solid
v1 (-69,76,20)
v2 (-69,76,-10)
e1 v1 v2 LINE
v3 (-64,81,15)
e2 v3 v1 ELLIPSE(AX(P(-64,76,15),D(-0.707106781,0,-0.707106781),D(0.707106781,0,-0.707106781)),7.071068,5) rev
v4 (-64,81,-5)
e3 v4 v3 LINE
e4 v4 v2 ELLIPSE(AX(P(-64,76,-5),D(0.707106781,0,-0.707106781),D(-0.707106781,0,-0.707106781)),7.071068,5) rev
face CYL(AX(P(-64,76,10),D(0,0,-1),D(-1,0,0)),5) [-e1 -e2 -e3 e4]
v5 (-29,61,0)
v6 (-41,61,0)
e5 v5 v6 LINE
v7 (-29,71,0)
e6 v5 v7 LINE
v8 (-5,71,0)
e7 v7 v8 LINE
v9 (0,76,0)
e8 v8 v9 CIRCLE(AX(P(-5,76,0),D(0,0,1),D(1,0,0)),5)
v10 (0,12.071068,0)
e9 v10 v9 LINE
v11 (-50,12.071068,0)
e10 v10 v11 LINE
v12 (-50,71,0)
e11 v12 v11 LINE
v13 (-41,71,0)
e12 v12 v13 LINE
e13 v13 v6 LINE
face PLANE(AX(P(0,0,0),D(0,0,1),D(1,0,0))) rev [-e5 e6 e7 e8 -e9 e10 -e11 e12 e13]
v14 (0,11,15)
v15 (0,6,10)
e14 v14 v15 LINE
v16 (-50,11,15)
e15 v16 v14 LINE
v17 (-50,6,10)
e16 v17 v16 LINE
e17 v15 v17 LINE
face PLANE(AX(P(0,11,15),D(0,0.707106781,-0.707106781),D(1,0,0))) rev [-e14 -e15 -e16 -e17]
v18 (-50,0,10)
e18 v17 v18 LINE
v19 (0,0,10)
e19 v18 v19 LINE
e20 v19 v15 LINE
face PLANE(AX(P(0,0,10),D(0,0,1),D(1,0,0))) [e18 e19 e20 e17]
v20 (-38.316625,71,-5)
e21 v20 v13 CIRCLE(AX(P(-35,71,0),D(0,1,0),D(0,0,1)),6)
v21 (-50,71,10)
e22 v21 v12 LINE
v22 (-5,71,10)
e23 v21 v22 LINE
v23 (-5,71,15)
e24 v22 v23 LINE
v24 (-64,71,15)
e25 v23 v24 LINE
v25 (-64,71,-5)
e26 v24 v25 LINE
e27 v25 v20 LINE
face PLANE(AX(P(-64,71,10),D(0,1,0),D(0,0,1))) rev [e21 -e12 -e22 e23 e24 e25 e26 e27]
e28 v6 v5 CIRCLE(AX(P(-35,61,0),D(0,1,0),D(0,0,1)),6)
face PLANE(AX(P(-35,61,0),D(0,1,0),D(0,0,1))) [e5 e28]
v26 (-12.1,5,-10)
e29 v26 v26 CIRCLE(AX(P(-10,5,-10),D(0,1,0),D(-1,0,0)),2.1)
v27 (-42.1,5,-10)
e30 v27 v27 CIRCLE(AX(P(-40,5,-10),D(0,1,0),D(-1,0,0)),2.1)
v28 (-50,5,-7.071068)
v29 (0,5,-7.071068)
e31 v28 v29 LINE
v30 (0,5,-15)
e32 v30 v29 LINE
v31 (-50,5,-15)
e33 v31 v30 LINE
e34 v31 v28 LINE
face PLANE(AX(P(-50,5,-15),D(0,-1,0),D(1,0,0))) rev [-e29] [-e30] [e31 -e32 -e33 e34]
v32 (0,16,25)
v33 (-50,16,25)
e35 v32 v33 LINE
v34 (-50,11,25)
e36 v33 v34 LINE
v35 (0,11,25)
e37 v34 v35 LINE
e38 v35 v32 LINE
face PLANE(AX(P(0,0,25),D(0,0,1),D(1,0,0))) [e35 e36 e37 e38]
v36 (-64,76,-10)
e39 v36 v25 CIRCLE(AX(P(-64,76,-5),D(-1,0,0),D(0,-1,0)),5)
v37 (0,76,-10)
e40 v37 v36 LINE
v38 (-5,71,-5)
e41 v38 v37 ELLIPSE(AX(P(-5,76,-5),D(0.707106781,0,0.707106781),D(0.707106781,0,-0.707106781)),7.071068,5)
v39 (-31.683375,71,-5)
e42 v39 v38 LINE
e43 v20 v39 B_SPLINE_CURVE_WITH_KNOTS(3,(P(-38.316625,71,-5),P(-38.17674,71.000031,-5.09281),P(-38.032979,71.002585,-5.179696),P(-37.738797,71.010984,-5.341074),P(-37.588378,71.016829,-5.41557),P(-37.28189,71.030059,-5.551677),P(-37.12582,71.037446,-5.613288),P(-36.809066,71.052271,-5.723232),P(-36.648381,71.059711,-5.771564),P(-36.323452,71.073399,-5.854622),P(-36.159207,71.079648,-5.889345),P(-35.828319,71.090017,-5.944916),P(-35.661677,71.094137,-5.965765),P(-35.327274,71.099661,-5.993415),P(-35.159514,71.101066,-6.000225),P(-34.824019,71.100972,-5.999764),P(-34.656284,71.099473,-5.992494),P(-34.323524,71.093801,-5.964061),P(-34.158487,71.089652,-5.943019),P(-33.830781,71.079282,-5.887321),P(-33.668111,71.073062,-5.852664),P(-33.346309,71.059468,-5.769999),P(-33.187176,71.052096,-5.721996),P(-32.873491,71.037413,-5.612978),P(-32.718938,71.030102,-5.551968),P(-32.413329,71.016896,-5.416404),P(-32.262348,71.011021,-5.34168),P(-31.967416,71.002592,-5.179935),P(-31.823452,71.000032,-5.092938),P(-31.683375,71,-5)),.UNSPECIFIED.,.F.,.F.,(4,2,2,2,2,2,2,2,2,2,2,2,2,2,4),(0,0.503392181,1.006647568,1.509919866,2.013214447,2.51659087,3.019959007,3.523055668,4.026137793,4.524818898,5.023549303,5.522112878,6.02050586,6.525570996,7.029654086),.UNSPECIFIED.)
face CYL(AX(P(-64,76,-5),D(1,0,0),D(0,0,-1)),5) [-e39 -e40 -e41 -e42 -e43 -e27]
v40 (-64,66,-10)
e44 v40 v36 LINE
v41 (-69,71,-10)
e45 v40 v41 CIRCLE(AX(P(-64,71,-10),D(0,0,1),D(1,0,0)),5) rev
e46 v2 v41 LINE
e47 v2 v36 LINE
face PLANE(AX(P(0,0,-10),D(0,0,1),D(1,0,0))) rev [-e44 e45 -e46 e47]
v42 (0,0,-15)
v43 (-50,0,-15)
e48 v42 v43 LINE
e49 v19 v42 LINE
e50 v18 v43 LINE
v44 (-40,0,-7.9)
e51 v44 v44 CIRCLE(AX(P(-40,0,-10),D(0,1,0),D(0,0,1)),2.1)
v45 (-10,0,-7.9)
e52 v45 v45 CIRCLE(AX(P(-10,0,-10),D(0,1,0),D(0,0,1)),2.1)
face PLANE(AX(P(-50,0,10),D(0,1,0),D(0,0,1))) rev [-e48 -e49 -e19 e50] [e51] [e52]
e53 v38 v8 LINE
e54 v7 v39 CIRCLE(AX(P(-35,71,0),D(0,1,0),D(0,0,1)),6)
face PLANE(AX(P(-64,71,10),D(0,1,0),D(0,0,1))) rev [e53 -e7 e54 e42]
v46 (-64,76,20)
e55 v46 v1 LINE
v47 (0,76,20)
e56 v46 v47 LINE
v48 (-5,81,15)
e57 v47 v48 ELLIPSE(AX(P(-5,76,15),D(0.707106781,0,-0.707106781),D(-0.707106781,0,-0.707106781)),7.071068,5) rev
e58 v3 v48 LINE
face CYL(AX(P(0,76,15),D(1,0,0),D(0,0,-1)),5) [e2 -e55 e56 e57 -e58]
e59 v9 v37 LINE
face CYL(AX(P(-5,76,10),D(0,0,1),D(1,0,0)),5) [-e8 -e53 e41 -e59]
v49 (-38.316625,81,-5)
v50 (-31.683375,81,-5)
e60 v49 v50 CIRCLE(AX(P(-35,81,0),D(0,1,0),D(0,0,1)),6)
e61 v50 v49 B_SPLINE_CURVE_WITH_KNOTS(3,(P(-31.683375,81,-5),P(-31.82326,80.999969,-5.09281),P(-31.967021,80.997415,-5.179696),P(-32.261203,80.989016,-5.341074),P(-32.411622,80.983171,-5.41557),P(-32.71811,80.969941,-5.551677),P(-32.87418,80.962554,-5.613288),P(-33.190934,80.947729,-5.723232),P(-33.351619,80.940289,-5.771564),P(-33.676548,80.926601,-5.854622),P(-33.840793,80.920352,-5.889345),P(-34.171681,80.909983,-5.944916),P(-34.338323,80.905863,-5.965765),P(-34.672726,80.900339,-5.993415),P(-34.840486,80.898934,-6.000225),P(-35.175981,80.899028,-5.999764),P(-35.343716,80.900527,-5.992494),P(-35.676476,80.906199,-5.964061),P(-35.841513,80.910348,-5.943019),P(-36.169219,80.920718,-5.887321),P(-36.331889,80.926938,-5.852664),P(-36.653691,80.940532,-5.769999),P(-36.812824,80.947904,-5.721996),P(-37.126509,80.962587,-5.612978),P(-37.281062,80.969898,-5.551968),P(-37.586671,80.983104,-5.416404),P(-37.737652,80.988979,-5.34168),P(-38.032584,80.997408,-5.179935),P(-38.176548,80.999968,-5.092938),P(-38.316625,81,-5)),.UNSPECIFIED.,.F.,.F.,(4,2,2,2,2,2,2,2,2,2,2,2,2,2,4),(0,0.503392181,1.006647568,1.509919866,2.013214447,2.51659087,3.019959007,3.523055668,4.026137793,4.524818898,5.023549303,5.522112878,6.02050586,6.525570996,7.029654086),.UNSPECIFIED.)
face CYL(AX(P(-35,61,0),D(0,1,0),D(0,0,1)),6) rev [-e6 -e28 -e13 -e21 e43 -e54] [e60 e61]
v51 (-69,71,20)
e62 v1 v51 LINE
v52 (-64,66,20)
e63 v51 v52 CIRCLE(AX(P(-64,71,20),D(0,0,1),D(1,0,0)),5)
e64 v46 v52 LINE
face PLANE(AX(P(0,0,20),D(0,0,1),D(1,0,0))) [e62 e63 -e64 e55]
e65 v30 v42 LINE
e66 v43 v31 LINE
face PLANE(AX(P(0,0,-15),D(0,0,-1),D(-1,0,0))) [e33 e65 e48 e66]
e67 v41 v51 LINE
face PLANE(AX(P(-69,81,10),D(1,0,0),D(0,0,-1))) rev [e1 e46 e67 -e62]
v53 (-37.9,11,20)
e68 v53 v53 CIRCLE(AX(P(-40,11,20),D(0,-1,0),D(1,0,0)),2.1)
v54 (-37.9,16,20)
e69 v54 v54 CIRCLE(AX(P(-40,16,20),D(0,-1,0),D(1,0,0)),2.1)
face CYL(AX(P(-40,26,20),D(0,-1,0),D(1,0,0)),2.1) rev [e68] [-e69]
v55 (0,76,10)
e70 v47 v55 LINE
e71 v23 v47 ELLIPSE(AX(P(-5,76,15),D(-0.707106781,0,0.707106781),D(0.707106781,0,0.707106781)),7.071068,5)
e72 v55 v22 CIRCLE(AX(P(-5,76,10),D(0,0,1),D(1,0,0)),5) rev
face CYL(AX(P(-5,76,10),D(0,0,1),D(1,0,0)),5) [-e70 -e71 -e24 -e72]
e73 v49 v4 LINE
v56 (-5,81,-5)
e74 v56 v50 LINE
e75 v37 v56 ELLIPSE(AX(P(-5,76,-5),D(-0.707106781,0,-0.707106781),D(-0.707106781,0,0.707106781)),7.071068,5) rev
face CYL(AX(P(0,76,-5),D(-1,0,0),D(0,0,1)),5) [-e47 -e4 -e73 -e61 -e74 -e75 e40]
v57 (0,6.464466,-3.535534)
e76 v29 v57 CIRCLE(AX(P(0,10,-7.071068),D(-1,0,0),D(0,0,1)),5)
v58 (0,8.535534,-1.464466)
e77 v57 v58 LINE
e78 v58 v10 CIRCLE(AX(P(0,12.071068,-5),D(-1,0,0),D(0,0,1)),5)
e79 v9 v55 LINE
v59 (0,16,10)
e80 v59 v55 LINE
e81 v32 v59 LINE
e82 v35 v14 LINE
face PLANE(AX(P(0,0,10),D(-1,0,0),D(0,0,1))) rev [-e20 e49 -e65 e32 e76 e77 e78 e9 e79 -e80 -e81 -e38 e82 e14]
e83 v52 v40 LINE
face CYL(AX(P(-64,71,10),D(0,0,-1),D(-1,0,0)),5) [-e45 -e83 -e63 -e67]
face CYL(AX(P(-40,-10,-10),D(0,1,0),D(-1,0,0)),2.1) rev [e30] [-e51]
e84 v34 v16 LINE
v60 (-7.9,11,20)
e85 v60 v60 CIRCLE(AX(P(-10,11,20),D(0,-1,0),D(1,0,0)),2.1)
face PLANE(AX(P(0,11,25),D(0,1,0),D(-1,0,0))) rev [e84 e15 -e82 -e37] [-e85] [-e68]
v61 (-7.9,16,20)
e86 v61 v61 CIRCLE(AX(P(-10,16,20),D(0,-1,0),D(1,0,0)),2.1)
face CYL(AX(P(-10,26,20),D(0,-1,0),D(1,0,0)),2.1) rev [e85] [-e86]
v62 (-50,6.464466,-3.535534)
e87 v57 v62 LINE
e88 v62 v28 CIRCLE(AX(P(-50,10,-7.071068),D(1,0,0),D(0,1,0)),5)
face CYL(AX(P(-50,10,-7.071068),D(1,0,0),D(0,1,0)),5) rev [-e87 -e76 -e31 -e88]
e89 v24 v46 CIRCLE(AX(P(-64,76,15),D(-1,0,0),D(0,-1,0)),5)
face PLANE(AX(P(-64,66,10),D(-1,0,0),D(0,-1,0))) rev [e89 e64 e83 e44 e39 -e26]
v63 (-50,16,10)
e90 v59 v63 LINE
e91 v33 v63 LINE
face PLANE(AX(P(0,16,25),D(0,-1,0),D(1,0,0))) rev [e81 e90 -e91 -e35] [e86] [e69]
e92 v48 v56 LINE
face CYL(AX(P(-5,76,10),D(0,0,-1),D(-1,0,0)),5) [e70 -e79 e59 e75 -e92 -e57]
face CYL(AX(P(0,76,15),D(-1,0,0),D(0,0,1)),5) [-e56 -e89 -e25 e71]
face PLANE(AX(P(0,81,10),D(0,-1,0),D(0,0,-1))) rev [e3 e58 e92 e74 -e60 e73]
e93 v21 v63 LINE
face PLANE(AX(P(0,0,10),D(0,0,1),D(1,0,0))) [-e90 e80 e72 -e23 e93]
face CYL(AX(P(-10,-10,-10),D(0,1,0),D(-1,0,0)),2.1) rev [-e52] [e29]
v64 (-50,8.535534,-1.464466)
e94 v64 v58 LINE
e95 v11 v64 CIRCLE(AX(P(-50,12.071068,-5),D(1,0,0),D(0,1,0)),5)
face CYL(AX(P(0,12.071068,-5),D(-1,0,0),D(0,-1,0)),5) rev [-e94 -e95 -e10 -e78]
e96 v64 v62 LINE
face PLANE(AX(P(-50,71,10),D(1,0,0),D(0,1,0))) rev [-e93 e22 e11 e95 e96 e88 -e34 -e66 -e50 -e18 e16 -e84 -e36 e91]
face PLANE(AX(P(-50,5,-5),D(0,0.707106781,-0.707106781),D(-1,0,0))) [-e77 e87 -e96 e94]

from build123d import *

# Parameters (mm, degrees)
BOSS_EXTRU_1_DEPTH      = 10
BOSS_EXTRU_2_DEPTH      = 10
BOSS_EXTRU_2_DEPTH_BACK = 20
ESQUISSE2_W             = 69
ESQUISSE2_H             = 10
ESQUISSE3_W             = 50
ESQUISSE3_H             = 5
BOSS_EXTRU_3_DEPTH      = 15
CHANFREIN1_SIZE         = 5
ESQUISSE4_R             = 2.1
ENL_V_MAT_EXTRU_1_DEPTH = 15
ESQUISSE5_W             = 30
ESQUISSE5_H             = 5
BOSS_EXTRU_4_DEPTH      = 5
ESQUISSE6_W             = 50
ESQUISSE6_H             = 5
BOSS_EXTRU_5_DEPTH      = 15
CHANFREIN2_SIZE         = 5
ESQUISSE7_R             = 2.1
ENL_V_MAT_EXTRU_2_DEPTH = 15
ESQUISSE8_R             = 6
ENL_V_MAT_EXTRU_3_DEPTH = 20
CONG_1_R                = 5


with BuildPart() as part:
    # Esquisse1 → Boss.-Extru.1 (new body)
    with BuildSketch(Plane.XY):
        Polygon((0, 0), (0, 81), (-69, 81), (-69, 66), (-64, 66), (-64, 71), (-50, 71), (-50, 0), align=None)
    extrude(amount=BOSS_EXTRU_1_DEPTH)

    # Esquisse2 → Boss.-Extru.2 (add, two sides: drawn at the far end of the back side and taken through both)
    with BuildSketch(Plane.XY.offset(10).offset(-BOSS_EXTRU_2_DEPTH_BACK)):
        with Locations((-34.5, 76)):
            Rectangle(ESQUISSE2_W, ESQUISSE2_H)
    extrude(amount=BOSS_EXTRU_2_DEPTH + BOSS_EXTRU_2_DEPTH_BACK)

    # Esquisse3 → Boss.-Extru.3 (add)
    with BuildSketch(Plane(origin=(0, 0, 0), x_dir=(-1, 0, 0), z_dir=(0, 0, -1))):
        with Locations((25, 2.5)):
            Rectangle(ESQUISSE3_W, ESQUISSE3_H)
    extrude(amount=BOSS_EXTRU_3_DEPTH)

    # Chanfrein1
    chanfrein1_edges = [part.edges().sort_by_distance(p)[0] for p in [
        (-25, 5, 0),
    ]]
    chamfer(chanfrein1_edges, length=CHANFREIN1_SIZE)

    # Esquisse4 → Enlèv. mat.-Extru.1 (cut)
    with BuildSketch(Plane(origin=(0, 5, 0), x_dir=(1, 0, 0), z_dir=(0, 1, 0))):
        with Locations(Location((-40, 10, 0), (0, 0, 180))):
            Circle(ESQUISSE4_R)
        with Locations(Location((-10, 10, 0), (0, 0, 180))):
            Circle(ESQUISSE4_R)
    extrude(amount=-ENL_V_MAT_EXTRU_1_DEPTH, mode=Mode.SUBTRACT)

    # Esquisse5 → Boss.-Extru.4 (add)
    with BuildSketch(Plane.ZY.offset(69)):
        with Locations((5, 68.5)):
            Rectangle(ESQUISSE5_W, ESQUISSE5_H)
    extrude(amount=-BOSS_EXTRU_4_DEPTH)

    # Esquisse6 → Boss.-Extru.5 (add)
    with BuildSketch(Plane.XY.offset(10)):
        with Locations((-25, 13.5)):
            Rectangle(ESQUISSE6_W, ESQUISSE6_H)
    extrude(amount=BOSS_EXTRU_5_DEPTH)

    # Chanfrein2
    chanfrein2_edges = [part.edges().sort_by_distance(p)[0] for p in [
        (-25, 11, 10),
    ]]
    chamfer(chanfrein2_edges, length=CHANFREIN2_SIZE)

    # Esquisse7 → Enlèv. mat.-Extru.2 (cut)
    with BuildSketch(Plane.XZ.offset(-11)):
        with Locations((-10, 20)):
            Circle(ESQUISSE7_R)
        with Locations((-40, 20)):
            Circle(ESQUISSE7_R)
    extrude(amount=-ENL_V_MAT_EXTRU_2_DEPTH, mode=Mode.SUBTRACT)

    # Esquisse8 → Enlèv. mat.-Extru.3 (cut)
    with BuildSketch(Plane(origin=(0, 81, 0), x_dir=(1, 0, 0), z_dir=(0, 1, 0))):
        with Locations(Location((-35, 0, 0), (0, 0, 270))):
            Circle(ESQUISSE8_R)
    extrude(amount=-ENL_V_MAT_EXTRU_3_DEPTH, mode=Mode.SUBTRACT)

    # Congé1
    # the kernel refuses this fillet: 5 mm, written as the material it adds along each edge
    with BuildSketch(Plane(origin=(0, 10, 0), x_dir=(0, -0.7071067811865476, -0.7071067811865476), z_dir=(-1, 0, 0)), Plane(origin=(0, 5, -5), x_dir=(0, 0, -1), z_dir=(-1, 0, 0))) as cong_1_piece_1:
        with BuildLine():
            CenterArc((CONG_1_R * 0.414213562373, -CONG_1_R), CONG_1_R, 90, 45)
            Line((-CONG_1_R * 0.292893218813, -CONG_1_R * 0.292893218813), (0, 0))
            Line((0, 0), (CONG_1_R * 0.414213562373, 0))
        make_face()
    extrude(amount=50)
    # the kernel refuses this fillet: 5 mm, written as the material it takes off along each edge
    with BuildSketch(Plane(origin=(-81.5, 81, 20), x_dir=(0, -1, 0), z_dir=(1, 0, 0))) as cong_1_2_piece_1:
        with BuildLine():
            CenterArc((CONG_1_R, CONG_1_R), CONG_1_R, 180, 90)
            Line((0, CONG_1_R), (0, 0))
            Line((0, 0), (CONG_1_R, 0))
        make_face()
    extrude(amount=94, mode=Mode.SUBTRACT)
    with BuildSketch(Plane(origin=(12.5, 71, 20), x_dir=(0, 0, -1), z_dir=(-1, 0, 0))) as cong_1_2_piece_2:
        with BuildLine():
            CenterArc((CONG_1_R, -CONG_1_R), CONG_1_R, 90, 90)
            Line((0, -CONG_1_R), (0, 0))
            Line((0, 0), (CONG_1_R, 0))
        make_face()
    extrude(amount=76.5, mode=Mode.SUBTRACT)
    with BuildSketch(Plane(origin=(0, 71, -2.5), x_dir=(0, 1, 0), z_dir=(0, 0, 1))) as cong_1_2_piece_3_section:
        with BuildLine():
            CenterArc((CONG_1_R, CONG_1_R), CONG_1_R, 180, 90)
            Line((0, CONG_1_R), (0, 0))
            Line((0, 0), (CONG_1_R, 0))
        make_face()
    cong_1_2_piece_3 = extrude(amount=35, mode=Mode.PRIVATE)
    cong_1_2_piece_3 = split(cong_1_2_piece_3, bisect_by=Plane(origin=(-1.116839695, 72.116839695, 0), z_dir=(0, 0, -1)), keep=Keep.TOP, mode=Mode.PRIVATE)
    add(cong_1_2_piece_3, mode=Mode.SUBTRACT)
    with BuildSketch(Plane(origin=(0, 71, 10), x_dir=(0, 1, 0), z_dir=(0, 0, 1)), Plane(origin=(0, 71, -22.5), x_dir=(0, 1, 0), z_dir=(0, 0, 1))) as cong_1_2_piece_4:
        with BuildLine():
            CenterArc((CONG_1_R, CONG_1_R), CONG_1_R, 180, 90)
            Line((0, CONG_1_R), (0, 0))
            Line((0, 0), (CONG_1_R, 0))
        make_face()
    extrude(amount=22.5, mode=Mode.SUBTRACT)
    with BuildSketch(Plane(origin=(0, 71, -22.5), x_dir=(0, 1, 0), z_dir=(0, 0, 1))) as cong_1_2_piece_5_section:
        with BuildLine():
            CenterArc((CONG_1_R, CONG_1_R), CONG_1_R, 180, 90)
            Line((0, CONG_1_R), (0, 0))
            Line((0, 0), (CONG_1_R, 0))
        make_face()
    cong_1_2_piece_5 = extrude(amount=35, mode=Mode.PRIVATE)
    cong_1_2_piece_5 = split(cong_1_2_piece_5, bisect_by=Plane(origin=(-1.116839695, 72.116839695, 10), z_dir=(0, 0, 1)), keep=Keep.TOP, mode=Mode.PRIVATE)
    add(cong_1_2_piece_5, mode=Mode.SUBTRACT)
    with BuildSketch(Plane(origin=(0, 81, -22.5), x_dir=(0, -1, 0), z_dir=(0, 0, 1)), Plane(origin=(-69, 81, -22.5), x_dir=(1, 0, 0), z_dir=(0, 0, 1))) as cong_1_2_piece_6:
        with BuildLine():
            CenterArc((CONG_1_R, -CONG_1_R), CONG_1_R, 90, 90)
            Line((0, -CONG_1_R), (0, 0))
            Line((0, 0), (CONG_1_R, 0))
        make_face()
    extrude(amount=55, mode=Mode.SUBTRACT)
    with BuildSketch(Plane(origin=(12.5, 71, -10), x_dir=(0, 0, 1), z_dir=(-1, 0, 0))) as cong_1_2_piece_7:
        with BuildLine():
            CenterArc((CONG_1_R, CONG_1_R), CONG_1_R, 180, 90)
            Line((0, CONG_1_R), (0, 0))
            Line((0, 0), (CONG_1_R, 0))
        make_face()
    extrude(amount=76.5, mode=Mode.SUBTRACT)
    with BuildSketch(Plane(origin=(-81.5, 81, -10), x_dir=(0, -1, 0), z_dir=(1, 0, 0))) as cong_1_2_piece_8:
        with BuildLine():
            CenterArc((CONG_1_R, -CONG_1_R), CONG_1_R, 90, 90)
            Line((0, -CONG_1_R), (0, 0))
            Line((0, 0), (CONG_1_R, 0))
        make_face()
    extrude(amount=94, mode=Mode.SUBTRACT)
    with BuildSketch(Plane(origin=(-69, 66, -22.5), x_dir=(1, 0, 0), z_dir=(0, 0, 1))) as cong_1_2_piece_9:
        with BuildLine():
            CenterArc((CONG_1_R, CONG_1_R), CONG_1_R, 180, 90)
            Line((0, CONG_1_R), (0, 0))
            Line((0, 0), (CONG_1_R, 0))
        make_face()
    extrude(amount=55, mode=Mode.SUBTRACT)


solid = part.part
